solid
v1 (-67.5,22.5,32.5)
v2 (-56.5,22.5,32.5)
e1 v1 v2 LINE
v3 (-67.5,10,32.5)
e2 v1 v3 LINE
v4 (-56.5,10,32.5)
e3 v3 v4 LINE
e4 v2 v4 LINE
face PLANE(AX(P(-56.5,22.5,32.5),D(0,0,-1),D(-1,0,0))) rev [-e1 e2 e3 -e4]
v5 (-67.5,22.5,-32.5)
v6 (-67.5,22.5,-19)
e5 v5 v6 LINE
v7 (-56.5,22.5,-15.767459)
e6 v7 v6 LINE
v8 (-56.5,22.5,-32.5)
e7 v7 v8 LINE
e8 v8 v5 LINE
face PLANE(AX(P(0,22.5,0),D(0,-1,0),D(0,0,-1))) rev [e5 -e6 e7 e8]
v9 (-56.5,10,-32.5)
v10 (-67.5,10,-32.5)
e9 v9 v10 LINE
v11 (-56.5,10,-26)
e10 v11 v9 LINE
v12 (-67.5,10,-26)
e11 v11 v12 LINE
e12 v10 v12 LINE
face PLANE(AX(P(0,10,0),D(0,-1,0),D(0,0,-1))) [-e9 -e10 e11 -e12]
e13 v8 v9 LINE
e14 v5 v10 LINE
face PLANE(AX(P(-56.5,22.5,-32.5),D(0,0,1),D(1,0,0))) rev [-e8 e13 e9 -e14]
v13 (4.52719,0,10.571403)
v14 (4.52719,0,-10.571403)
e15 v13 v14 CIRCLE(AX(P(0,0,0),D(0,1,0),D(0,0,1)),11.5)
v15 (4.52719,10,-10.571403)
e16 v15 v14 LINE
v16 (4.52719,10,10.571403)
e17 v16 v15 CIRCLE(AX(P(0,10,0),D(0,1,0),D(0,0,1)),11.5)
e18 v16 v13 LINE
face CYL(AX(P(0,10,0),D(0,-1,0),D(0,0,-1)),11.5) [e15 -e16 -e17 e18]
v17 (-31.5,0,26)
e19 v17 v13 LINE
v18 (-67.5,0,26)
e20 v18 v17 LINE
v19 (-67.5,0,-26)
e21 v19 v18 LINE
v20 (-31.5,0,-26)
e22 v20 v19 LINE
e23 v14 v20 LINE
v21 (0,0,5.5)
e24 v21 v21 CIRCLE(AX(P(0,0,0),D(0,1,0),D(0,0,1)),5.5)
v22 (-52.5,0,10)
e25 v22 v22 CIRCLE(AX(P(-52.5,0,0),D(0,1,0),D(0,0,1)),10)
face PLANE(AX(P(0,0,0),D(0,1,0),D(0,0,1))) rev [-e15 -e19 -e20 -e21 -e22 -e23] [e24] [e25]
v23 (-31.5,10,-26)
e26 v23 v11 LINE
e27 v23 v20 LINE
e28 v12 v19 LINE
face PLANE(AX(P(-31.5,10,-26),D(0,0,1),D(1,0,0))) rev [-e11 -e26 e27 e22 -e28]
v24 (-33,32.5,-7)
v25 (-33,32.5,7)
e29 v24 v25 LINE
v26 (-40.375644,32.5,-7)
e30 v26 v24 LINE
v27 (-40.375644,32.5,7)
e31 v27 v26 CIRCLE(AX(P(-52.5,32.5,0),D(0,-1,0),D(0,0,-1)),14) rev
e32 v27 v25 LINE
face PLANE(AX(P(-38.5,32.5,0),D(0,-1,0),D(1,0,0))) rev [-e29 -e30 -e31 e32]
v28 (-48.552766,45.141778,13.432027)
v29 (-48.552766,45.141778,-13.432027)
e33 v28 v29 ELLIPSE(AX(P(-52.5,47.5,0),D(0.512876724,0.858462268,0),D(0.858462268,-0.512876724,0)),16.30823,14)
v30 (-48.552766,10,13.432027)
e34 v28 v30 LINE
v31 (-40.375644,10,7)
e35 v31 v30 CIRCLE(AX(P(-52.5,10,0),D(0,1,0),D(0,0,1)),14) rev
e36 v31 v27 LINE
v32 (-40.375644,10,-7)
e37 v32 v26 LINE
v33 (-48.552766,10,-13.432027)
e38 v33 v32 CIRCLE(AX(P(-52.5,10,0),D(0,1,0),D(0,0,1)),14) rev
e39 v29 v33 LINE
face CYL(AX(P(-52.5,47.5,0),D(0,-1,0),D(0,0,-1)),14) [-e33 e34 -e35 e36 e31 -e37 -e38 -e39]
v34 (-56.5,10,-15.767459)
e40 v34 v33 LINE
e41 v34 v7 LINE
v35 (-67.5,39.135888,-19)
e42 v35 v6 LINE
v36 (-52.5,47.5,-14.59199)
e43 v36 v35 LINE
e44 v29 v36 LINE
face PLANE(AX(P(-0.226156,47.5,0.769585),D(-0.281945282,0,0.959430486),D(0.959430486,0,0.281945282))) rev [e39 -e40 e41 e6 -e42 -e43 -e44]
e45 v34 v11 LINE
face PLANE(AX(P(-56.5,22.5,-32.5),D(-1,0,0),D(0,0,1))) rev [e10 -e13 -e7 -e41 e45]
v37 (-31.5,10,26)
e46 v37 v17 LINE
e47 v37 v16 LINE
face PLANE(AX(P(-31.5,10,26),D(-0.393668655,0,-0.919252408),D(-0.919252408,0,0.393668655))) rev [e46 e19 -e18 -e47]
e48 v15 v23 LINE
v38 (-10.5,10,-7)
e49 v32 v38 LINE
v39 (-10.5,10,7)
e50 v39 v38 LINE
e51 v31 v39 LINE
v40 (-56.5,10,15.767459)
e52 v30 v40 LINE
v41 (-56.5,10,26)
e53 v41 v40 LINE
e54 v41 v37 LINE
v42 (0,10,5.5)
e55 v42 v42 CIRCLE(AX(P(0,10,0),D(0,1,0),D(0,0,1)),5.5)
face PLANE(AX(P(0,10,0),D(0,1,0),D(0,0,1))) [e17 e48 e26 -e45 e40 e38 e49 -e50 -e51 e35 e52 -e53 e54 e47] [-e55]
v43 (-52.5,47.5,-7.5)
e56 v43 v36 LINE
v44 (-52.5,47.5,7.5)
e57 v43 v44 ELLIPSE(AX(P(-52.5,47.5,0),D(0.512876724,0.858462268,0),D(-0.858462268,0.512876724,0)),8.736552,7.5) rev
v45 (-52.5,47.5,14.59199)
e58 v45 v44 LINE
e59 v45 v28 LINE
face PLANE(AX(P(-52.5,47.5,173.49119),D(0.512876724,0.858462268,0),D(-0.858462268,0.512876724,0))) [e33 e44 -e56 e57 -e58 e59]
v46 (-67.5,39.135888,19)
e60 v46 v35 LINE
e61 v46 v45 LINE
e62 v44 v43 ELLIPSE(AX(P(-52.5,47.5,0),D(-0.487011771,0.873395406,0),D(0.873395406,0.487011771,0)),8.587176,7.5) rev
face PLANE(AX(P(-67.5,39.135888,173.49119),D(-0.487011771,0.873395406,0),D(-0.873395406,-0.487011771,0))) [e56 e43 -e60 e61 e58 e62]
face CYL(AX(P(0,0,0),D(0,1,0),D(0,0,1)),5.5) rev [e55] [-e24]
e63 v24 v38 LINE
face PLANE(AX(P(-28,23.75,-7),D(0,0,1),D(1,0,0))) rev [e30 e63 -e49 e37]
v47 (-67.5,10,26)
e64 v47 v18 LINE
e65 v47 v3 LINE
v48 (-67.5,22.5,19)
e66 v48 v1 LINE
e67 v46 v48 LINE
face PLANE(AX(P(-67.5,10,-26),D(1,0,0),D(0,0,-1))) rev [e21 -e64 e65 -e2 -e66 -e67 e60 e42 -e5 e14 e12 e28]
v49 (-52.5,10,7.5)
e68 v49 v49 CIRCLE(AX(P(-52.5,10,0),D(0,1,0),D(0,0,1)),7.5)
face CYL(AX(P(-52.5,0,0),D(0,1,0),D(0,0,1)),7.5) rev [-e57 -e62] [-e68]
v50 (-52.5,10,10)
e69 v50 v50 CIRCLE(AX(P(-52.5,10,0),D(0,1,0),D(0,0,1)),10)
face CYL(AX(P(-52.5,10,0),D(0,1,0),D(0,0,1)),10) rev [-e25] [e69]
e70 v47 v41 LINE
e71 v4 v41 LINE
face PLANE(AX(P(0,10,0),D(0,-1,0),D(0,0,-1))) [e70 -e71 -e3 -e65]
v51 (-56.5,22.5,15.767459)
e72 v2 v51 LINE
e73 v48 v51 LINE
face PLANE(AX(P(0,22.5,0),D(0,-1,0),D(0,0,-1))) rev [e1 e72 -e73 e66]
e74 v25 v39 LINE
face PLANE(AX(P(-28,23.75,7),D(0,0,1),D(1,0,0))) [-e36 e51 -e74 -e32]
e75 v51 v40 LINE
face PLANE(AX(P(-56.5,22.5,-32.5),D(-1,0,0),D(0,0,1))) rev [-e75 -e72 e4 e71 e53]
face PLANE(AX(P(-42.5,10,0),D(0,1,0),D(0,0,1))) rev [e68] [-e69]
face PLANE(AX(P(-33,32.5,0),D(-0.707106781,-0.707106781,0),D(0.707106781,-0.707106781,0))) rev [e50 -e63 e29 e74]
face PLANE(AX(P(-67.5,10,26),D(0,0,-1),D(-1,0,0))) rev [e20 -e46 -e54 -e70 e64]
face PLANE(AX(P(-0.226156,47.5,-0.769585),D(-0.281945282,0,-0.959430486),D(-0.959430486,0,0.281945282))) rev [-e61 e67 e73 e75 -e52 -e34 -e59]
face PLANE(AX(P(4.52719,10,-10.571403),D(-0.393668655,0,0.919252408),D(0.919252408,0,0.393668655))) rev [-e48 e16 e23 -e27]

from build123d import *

# Parameters (mm, degrees)
BOSS_EXTRUDE2_DEPTH = 10
SKETCH2_R           = 5.5
CUT_EXTRUDE1_DEPTH  = 10
SKETCH3_W           = 11
SKETCH3_H           = 65
BOSS_EXTRUDE3_DEPTH = 12.5
BOSS_EXTRUDE4_START = -10
BOSS_EXTRUDE4_DEPTH = 47.5
SKETCH7_R           = 7.5
CUT_EXTRUDE2_DEPTH  = 89.705974996
RIB1_START          = -7
RIB1_DEPTH          = 14
CUT_EXTRUDE3_START  = -19
CUT_EXTRUDE3_DEPTH  = 38


# Read off the part's stored shape, not the designer's step: Rib1, Cut-Extrude3
with BuildPart() as part:
    # Sketch1 → Boss-Extrude2 (new body)
    with BuildSketch(Plane(origin=(0, 0, 0), x_dir=(1, 0, 0), z_dir=(0, 1, 0))):
        with BuildLine():
            Line((-67.5, 26), (-67.5, -26))
            Line((-67.5, -26), (-31.5, -26))
            Line((-31.5, -26), (4.527189528, -10.571402697))
            ThreePointArc((4.527189528, -10.571402697), (11.5, 0), (4.527189528, 10.571402697))
            Line((4.527189528, 10.571402697), (-31.5, 26))
            Line((-31.5, 26), (-67.5, 26))
        make_face()
    extrude(amount=BOSS_EXTRUDE2_DEPTH)

    # Sketch2 → Cut-Extrude1 (cut)
    with BuildSketch(Plane(origin=(0, 10, 0), x_dir=(1, 0, 0), z_dir=(0, 1, 0))):
        with Locations(Location((0, 0, 0), (0, 0, 270))):
            Circle(SKETCH2_R)
    extrude(amount=-CUT_EXTRUDE1_DEPTH, mode=Mode.SUBTRACT)

    # Sketch3 → Boss-Extrude3 (add)
    with BuildSketch(Plane(origin=(0, 10, 0), x_dir=(1, 0, 0), z_dir=(0, 1, 0))):
        with Locations((-62, 0)):
            Rectangle(SKETCH3_W, SKETCH3_H)
    extrude(amount=BOSS_EXTRUDE3_DEPTH)

    # Sketch4 → Boss-Extrude4 (add)
    with BuildSketch(Plane(origin=(0, 10, 0), x_dir=(1, 0, 0), z_dir=(0, 1, 0)).offset(BOSS_EXTRUDE4_START)):
        with BuildLine():
            Line((-67.5, 19), (-67.5, -19))
            Line((-67.5, -19), (-48.552766046, -13.432026806))
            ThreePointArc((-48.552766046, -13.432026806), (-38.5, 0), (-48.552766046, 13.432026806))
            Line((-48.552766046, 13.432026806), (-67.5, 19))
        make_face()
    extrude(amount=BOSS_EXTRUDE4_DEPTH)

    # Sketch6 → Hole1 (revolve, cut)
    with BuildSketch(Plane(origin=(-52.5, 10, 0), x_dir=(0, 0, 1), z_dir=(1, 0, 0))):
        Polygon((0, 0), (0, 10), (7, 10), (7, 15), (10, 15), (10, 0), align=None)
    revolve(axis=Axis((-52.5, -100, 0), (0, 1, 0)), mode=Mode.SUBTRACT)

    # Sketch7 → Cut-Extrude2 (cut, through all)
    with BuildSketch(Plane(origin=(0, 47.5, 0), x_dir=(1, 0, 0), z_dir=(0, 1, 0))):
        with Locations(Location((-52.5, 0, 0), (0, 0, 270))):
            Circle(SKETCH7_R)
    extrude(amount=-CUT_EXTRUDE2_DEPTH, mode=Mode.SUBTRACT)

    # Rib1 outline → Rib1 (add)
    with BuildSketch(Plane.XY.offset(RIB1_START)):
        Polygon((-33, 32.5), (-42, 32.5), (-42, 10), (-10.5, 10), align=None)
    extrude(amount=RIB1_DEPTH)

    # Cut-Extrude3 outline → Cut-Extrude3 (cut)
    with BuildSketch(Plane.XY.offset(CUT_EXTRUDE3_START)):
        Polygon((-37, 47.5), (-52.5, 47.5), (-38.5, 39.135888498), (-37, 38.239733694), align=None)
        Polygon((-67.5, 39.135888498), (-52.5, 47.5), (-67.5, 47.5), align=None)
    extrude(amount=CUT_EXTRUDE3_DEPTH, mode=Mode.SUBTRACT)


solid = part.part
